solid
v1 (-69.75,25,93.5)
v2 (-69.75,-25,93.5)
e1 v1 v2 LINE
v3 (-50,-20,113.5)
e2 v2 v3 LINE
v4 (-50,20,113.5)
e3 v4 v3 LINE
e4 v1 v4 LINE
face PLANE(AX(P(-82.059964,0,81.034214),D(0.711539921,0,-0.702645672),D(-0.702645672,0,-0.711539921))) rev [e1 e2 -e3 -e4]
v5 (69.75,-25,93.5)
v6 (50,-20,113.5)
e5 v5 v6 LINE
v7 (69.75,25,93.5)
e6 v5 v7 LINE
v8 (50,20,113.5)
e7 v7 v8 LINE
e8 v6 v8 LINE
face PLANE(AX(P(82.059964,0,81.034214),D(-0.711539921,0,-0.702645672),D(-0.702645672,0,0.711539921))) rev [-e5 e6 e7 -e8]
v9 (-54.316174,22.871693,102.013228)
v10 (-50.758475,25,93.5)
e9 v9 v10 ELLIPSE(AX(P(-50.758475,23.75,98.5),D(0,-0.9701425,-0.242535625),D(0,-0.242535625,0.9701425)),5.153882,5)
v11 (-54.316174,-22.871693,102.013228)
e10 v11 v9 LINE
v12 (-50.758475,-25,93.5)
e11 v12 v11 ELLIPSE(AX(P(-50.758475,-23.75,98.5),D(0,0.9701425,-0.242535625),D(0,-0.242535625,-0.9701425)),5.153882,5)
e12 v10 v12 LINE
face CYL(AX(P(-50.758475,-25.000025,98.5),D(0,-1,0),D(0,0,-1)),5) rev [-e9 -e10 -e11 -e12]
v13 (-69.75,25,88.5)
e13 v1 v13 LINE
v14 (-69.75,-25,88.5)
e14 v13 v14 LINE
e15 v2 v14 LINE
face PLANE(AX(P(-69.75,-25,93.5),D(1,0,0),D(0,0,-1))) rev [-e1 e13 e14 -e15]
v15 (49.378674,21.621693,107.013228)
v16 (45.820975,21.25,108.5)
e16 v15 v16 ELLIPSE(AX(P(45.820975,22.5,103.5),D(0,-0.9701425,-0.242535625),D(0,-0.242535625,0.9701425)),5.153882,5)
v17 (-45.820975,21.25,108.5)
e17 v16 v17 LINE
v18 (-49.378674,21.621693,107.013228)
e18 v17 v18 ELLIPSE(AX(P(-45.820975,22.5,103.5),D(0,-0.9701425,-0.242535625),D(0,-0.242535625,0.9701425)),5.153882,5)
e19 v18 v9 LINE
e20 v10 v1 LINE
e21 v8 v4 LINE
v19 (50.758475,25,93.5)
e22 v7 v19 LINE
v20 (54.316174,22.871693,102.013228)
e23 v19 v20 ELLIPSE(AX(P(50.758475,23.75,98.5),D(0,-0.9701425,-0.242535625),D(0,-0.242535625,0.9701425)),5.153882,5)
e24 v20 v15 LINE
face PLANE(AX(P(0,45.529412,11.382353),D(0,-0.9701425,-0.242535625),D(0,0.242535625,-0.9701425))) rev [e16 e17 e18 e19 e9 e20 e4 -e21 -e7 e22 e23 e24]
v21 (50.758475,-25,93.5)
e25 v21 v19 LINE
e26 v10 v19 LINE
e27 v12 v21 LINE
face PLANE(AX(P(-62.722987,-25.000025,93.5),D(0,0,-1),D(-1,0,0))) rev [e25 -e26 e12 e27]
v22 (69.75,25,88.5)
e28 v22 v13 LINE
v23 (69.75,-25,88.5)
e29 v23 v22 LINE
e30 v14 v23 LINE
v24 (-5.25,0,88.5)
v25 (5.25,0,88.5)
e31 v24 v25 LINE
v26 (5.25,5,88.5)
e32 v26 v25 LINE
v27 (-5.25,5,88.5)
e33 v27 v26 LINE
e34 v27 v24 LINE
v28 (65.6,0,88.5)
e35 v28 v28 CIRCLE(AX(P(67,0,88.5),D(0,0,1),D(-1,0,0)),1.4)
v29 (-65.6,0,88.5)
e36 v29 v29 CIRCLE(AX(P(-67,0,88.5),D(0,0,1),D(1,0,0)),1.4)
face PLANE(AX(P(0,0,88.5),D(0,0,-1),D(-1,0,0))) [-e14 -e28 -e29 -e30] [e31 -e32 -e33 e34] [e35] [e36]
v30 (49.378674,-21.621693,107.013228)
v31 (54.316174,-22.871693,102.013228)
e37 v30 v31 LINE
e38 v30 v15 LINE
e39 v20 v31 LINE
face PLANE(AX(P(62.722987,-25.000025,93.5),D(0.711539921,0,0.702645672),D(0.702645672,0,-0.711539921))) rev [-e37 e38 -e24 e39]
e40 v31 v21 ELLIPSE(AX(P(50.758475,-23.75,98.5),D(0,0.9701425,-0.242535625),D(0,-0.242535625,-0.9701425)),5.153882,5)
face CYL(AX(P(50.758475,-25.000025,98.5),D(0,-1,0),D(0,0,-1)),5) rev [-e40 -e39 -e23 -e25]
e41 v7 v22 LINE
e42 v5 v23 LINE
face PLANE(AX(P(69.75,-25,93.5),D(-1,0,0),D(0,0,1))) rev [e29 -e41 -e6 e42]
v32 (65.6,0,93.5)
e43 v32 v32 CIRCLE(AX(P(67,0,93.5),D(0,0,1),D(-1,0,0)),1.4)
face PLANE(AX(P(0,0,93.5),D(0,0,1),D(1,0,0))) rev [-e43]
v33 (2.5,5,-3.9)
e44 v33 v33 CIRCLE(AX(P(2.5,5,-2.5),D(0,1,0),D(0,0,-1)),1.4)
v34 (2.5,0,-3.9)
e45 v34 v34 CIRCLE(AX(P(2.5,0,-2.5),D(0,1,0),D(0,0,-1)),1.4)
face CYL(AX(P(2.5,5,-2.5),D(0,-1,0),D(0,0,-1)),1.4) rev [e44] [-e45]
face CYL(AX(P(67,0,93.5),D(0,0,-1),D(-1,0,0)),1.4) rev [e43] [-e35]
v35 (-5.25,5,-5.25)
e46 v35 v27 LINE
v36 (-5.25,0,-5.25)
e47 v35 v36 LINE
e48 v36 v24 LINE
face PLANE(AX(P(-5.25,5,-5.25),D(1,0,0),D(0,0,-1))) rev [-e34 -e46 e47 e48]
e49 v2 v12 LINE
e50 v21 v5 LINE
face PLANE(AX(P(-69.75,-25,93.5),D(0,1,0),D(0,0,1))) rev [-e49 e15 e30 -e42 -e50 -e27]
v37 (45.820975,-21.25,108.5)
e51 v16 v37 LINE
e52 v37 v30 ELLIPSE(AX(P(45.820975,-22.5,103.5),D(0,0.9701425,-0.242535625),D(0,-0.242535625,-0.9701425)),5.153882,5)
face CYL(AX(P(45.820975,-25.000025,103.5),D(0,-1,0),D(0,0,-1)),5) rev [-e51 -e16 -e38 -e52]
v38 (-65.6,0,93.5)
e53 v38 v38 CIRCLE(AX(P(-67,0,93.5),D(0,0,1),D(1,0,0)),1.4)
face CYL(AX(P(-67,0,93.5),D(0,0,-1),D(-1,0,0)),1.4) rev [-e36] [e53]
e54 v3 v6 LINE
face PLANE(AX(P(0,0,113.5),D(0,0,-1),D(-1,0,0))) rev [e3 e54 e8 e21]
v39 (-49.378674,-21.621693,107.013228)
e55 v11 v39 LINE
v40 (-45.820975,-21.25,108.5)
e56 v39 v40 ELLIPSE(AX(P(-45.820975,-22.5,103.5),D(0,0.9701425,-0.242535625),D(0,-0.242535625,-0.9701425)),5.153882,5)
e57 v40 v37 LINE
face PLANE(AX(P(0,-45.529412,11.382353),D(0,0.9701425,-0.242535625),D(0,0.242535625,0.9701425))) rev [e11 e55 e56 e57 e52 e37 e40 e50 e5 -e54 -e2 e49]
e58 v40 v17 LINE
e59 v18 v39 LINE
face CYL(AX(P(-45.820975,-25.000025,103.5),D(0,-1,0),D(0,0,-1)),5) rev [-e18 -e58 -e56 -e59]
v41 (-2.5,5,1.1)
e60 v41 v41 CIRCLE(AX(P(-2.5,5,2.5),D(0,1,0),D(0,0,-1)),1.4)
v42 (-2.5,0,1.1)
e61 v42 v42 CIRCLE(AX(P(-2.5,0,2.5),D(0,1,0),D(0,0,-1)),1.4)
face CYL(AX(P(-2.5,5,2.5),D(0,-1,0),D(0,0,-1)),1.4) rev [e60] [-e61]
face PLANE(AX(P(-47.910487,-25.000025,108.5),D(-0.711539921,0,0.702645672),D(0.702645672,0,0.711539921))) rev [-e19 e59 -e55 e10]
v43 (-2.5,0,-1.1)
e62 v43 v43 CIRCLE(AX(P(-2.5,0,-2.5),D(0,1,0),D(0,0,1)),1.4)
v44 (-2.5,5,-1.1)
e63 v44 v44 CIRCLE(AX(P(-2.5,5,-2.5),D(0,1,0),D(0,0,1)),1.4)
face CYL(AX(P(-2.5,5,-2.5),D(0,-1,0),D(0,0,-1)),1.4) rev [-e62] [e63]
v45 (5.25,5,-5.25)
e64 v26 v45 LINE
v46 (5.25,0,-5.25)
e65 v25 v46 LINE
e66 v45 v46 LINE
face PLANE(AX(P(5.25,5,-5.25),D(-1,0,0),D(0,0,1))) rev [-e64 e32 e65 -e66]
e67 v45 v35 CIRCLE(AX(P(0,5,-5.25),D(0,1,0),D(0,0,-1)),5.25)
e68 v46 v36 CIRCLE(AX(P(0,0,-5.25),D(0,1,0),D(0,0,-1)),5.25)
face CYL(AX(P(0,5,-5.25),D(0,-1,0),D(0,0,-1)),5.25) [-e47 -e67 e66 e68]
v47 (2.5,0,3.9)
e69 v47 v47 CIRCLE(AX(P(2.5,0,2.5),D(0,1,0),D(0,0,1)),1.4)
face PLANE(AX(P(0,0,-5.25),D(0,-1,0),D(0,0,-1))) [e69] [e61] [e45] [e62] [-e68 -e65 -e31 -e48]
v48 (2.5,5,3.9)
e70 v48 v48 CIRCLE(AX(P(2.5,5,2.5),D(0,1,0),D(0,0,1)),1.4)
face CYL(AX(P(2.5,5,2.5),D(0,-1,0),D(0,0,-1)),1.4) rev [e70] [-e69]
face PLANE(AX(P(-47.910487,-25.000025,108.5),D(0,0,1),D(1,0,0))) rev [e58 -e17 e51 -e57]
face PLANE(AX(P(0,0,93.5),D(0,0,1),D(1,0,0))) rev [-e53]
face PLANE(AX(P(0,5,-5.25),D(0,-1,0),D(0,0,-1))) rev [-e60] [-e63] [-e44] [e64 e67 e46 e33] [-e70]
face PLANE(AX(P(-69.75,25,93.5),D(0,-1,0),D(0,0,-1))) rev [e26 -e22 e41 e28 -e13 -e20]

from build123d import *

# Parameters (mm, degrees)
SKETCH1_R               = 1.4
BOSS_EXTRUDE1_DEPTH     = 5
SKETCH3_W               = 139.5
SKETCH3_H               = 50
SKETCH3_R               = 1.4
BOSS_EXTRUDE3_DEPTH     = 5
CUT_EXTRUDE1_DEPTH      = 136.544503915
CUT_EXTRUDE1_DEPTH_BACK = 136.544503915
FILLET1_START           = -25
FILLET1_DEPTH           = 50
FILLET1_START_2         = -21.62169291
FILLET1_2_DEPTH         = 43.24338582
FILLET1_START_3         = -69.75
FILLET1_3_DEPTH         = 139.5


with BuildPart() as part:
    # Sketch1 → Boss-Extrude1 (new body)
    with BuildSketch(Plane(origin=(0, 0, 0), x_dir=(1, 0, 0), z_dir=(0, 1, 0))):
        with BuildLine():
            Line((-5.25, 5.25), (-5.25, -88.5))
            Line((-5.25, -88.5), (5.25, -88.5))
            Line((5.25, -88.5), (5.25, 5.25))
            ThreePointArc((5.25, 5.25), (0, 10.5), (-5.25, 5.25))
        make_face()
        with Locations(Location((-2.5, 2.5, 0), (0, 0, 270))):
            Circle(SKETCH1_R, mode=Mode.SUBTRACT)
        with Locations(Location((2.5, 2.5, 0), (0, 0, 90))):
            Circle(SKETCH1_R, mode=Mode.SUBTRACT)
        with Locations(Location((-2.5, -2.5, 0), (0, 0, 90))):
            Circle(SKETCH1_R, mode=Mode.SUBTRACT)
        with Locations(Location((2.5, -2.5, 0), (0, 0, 270))):
            Circle(SKETCH1_R, mode=Mode.SUBTRACT)
    extrude(amount=BOSS_EXTRUDE1_DEPTH)

    # Sketch3 → Boss-Extrude3 (add)
    with BuildSketch(Plane.XY.offset(88.5)):
        Rectangle(SKETCH3_W, SKETCH3_H)
        with Locations((-67, 0)):
            Circle(SKETCH3_R, mode=Mode.SUBTRACT)
        with Locations(Location((67, 0, 0), (0, 0, 180))):
            Circle(SKETCH3_R, mode=Mode.SUBTRACT)
    extrude(amount=BOSS_EXTRUDE3_DEPTH)

    # Sketch4 → Loft1 section 0
    with BuildSketch(Plane.XY.offset(93.5)):
        with BuildLine():
            Line((69.75, -25), (69.75, 25))
            Line((69.75, 25), (-69.75, 25))
            Line((-69.75, 25), (-69.75, -25))
            Line((-69.75, -25), (69.75, -25))
        make_face()
    # Sketch5 → Loft1 section 1
    with BuildSketch(Plane.XY.offset(113.5)):
        with BuildLine():
            Line((-50, -20), (50, -20))
            Line((50, -20), (50, 20))
            Line((50, 20), (-50, 20))
            Line((-50, 20), (-50, -20))
        make_face()
    loft()

    # Sketch6 → Cut-Extrude1 (cut, two sides: drawn at the far end of the back side and taken through both)
    with BuildSketch(Plane(origin=(0, 0, 0), x_dir=(1, 0, 0), z_dir=(0, 1, 0)).offset(-CUT_EXTRUDE1_DEPTH_BACK)):
        Polygon((-47.910487388, -108.5), (47.910487388, -108.5), (62.722987388, -93.5), (-62.722987388, -93.5), align=None)
    extrude(amount=CUT_EXTRUDE1_DEPTH + CUT_EXTRUDE1_DEPTH_BACK, mode=Mode.SUBTRACT)

    # Fillet1: read off the stored shape, not the designer's step
    # Fillet1 outline → Fillet1 (add)
    with BuildSketch(Plane(origin=(0, 0, 0), x_dir=(1, 0, 0), z_dir=(0, 1, 0)).offset(FILLET1_START)):
        with BuildLine():
            Line((-62.722987388, -93.5), (-54.316174382, -102.013228361))
            ThreePointArc((-54.316174382, -102.013228361), (-55.371832653, -96.572066106), (-50.758474776, -93.5))
            Line((-50.758474776, -93.5), (-62.722987388, -93.5))
        make_face()
        with BuildLine():
            ThreePointArc((50.758474776, -93.5), (55.371832653, -96.572066106), (54.316174382, -102.013228361))
            Line((54.316174382, -102.013228361), (62.722987388, -93.5))
            Line((62.722987388, -93.5), (50.758474776, -93.5))
        make_face()
    extrude(amount=FILLET1_DEPTH)

    # Fillet1 2 outline → Fillet1 2 (add)
    with BuildSketch(Plane(origin=(0, 0, 0), x_dir=(1, 0, 0), z_dir=(0, 1, 0)).offset(FILLET1_START_2)):
        with BuildLine():
            Line((-47.910487388, -108.5), (-45.820974776, -108.5))
            ThreePointArc((-45.820974776, -108.5), (-47.74890867, -108.113357877), (-49.378674382, -107.013228361))
            Line((-49.378674382, -107.013228361), (-47.910487388, -108.5))
        make_face()
        with BuildLine():
            ThreePointArc((49.378674382, -107.013228361), (47.74890867, -108.113357877), (45.820974776, -108.5))
            Line((45.820974776, -108.5), (47.910487388, -108.5))
            Line((47.910487388, -108.5), (49.378674382, -107.013228361))
        make_face()
    extrude(amount=FILLET1_2_DEPTH)

    # Fillet1 3 outline → Fillet1 3 (cut)
    with BuildSketch(Plane.YZ.offset(FILLET1_START_3)):
        Polygon((25, 93.5), (25, 110), (20.875, 110), align=None)
        Polygon((-20.875, 110), (-25, 110), (-25, 93.5), align=None)
    extrude(amount=FILLET1_3_DEPTH, mode=Mode.SUBTRACT)


solid = part.part
